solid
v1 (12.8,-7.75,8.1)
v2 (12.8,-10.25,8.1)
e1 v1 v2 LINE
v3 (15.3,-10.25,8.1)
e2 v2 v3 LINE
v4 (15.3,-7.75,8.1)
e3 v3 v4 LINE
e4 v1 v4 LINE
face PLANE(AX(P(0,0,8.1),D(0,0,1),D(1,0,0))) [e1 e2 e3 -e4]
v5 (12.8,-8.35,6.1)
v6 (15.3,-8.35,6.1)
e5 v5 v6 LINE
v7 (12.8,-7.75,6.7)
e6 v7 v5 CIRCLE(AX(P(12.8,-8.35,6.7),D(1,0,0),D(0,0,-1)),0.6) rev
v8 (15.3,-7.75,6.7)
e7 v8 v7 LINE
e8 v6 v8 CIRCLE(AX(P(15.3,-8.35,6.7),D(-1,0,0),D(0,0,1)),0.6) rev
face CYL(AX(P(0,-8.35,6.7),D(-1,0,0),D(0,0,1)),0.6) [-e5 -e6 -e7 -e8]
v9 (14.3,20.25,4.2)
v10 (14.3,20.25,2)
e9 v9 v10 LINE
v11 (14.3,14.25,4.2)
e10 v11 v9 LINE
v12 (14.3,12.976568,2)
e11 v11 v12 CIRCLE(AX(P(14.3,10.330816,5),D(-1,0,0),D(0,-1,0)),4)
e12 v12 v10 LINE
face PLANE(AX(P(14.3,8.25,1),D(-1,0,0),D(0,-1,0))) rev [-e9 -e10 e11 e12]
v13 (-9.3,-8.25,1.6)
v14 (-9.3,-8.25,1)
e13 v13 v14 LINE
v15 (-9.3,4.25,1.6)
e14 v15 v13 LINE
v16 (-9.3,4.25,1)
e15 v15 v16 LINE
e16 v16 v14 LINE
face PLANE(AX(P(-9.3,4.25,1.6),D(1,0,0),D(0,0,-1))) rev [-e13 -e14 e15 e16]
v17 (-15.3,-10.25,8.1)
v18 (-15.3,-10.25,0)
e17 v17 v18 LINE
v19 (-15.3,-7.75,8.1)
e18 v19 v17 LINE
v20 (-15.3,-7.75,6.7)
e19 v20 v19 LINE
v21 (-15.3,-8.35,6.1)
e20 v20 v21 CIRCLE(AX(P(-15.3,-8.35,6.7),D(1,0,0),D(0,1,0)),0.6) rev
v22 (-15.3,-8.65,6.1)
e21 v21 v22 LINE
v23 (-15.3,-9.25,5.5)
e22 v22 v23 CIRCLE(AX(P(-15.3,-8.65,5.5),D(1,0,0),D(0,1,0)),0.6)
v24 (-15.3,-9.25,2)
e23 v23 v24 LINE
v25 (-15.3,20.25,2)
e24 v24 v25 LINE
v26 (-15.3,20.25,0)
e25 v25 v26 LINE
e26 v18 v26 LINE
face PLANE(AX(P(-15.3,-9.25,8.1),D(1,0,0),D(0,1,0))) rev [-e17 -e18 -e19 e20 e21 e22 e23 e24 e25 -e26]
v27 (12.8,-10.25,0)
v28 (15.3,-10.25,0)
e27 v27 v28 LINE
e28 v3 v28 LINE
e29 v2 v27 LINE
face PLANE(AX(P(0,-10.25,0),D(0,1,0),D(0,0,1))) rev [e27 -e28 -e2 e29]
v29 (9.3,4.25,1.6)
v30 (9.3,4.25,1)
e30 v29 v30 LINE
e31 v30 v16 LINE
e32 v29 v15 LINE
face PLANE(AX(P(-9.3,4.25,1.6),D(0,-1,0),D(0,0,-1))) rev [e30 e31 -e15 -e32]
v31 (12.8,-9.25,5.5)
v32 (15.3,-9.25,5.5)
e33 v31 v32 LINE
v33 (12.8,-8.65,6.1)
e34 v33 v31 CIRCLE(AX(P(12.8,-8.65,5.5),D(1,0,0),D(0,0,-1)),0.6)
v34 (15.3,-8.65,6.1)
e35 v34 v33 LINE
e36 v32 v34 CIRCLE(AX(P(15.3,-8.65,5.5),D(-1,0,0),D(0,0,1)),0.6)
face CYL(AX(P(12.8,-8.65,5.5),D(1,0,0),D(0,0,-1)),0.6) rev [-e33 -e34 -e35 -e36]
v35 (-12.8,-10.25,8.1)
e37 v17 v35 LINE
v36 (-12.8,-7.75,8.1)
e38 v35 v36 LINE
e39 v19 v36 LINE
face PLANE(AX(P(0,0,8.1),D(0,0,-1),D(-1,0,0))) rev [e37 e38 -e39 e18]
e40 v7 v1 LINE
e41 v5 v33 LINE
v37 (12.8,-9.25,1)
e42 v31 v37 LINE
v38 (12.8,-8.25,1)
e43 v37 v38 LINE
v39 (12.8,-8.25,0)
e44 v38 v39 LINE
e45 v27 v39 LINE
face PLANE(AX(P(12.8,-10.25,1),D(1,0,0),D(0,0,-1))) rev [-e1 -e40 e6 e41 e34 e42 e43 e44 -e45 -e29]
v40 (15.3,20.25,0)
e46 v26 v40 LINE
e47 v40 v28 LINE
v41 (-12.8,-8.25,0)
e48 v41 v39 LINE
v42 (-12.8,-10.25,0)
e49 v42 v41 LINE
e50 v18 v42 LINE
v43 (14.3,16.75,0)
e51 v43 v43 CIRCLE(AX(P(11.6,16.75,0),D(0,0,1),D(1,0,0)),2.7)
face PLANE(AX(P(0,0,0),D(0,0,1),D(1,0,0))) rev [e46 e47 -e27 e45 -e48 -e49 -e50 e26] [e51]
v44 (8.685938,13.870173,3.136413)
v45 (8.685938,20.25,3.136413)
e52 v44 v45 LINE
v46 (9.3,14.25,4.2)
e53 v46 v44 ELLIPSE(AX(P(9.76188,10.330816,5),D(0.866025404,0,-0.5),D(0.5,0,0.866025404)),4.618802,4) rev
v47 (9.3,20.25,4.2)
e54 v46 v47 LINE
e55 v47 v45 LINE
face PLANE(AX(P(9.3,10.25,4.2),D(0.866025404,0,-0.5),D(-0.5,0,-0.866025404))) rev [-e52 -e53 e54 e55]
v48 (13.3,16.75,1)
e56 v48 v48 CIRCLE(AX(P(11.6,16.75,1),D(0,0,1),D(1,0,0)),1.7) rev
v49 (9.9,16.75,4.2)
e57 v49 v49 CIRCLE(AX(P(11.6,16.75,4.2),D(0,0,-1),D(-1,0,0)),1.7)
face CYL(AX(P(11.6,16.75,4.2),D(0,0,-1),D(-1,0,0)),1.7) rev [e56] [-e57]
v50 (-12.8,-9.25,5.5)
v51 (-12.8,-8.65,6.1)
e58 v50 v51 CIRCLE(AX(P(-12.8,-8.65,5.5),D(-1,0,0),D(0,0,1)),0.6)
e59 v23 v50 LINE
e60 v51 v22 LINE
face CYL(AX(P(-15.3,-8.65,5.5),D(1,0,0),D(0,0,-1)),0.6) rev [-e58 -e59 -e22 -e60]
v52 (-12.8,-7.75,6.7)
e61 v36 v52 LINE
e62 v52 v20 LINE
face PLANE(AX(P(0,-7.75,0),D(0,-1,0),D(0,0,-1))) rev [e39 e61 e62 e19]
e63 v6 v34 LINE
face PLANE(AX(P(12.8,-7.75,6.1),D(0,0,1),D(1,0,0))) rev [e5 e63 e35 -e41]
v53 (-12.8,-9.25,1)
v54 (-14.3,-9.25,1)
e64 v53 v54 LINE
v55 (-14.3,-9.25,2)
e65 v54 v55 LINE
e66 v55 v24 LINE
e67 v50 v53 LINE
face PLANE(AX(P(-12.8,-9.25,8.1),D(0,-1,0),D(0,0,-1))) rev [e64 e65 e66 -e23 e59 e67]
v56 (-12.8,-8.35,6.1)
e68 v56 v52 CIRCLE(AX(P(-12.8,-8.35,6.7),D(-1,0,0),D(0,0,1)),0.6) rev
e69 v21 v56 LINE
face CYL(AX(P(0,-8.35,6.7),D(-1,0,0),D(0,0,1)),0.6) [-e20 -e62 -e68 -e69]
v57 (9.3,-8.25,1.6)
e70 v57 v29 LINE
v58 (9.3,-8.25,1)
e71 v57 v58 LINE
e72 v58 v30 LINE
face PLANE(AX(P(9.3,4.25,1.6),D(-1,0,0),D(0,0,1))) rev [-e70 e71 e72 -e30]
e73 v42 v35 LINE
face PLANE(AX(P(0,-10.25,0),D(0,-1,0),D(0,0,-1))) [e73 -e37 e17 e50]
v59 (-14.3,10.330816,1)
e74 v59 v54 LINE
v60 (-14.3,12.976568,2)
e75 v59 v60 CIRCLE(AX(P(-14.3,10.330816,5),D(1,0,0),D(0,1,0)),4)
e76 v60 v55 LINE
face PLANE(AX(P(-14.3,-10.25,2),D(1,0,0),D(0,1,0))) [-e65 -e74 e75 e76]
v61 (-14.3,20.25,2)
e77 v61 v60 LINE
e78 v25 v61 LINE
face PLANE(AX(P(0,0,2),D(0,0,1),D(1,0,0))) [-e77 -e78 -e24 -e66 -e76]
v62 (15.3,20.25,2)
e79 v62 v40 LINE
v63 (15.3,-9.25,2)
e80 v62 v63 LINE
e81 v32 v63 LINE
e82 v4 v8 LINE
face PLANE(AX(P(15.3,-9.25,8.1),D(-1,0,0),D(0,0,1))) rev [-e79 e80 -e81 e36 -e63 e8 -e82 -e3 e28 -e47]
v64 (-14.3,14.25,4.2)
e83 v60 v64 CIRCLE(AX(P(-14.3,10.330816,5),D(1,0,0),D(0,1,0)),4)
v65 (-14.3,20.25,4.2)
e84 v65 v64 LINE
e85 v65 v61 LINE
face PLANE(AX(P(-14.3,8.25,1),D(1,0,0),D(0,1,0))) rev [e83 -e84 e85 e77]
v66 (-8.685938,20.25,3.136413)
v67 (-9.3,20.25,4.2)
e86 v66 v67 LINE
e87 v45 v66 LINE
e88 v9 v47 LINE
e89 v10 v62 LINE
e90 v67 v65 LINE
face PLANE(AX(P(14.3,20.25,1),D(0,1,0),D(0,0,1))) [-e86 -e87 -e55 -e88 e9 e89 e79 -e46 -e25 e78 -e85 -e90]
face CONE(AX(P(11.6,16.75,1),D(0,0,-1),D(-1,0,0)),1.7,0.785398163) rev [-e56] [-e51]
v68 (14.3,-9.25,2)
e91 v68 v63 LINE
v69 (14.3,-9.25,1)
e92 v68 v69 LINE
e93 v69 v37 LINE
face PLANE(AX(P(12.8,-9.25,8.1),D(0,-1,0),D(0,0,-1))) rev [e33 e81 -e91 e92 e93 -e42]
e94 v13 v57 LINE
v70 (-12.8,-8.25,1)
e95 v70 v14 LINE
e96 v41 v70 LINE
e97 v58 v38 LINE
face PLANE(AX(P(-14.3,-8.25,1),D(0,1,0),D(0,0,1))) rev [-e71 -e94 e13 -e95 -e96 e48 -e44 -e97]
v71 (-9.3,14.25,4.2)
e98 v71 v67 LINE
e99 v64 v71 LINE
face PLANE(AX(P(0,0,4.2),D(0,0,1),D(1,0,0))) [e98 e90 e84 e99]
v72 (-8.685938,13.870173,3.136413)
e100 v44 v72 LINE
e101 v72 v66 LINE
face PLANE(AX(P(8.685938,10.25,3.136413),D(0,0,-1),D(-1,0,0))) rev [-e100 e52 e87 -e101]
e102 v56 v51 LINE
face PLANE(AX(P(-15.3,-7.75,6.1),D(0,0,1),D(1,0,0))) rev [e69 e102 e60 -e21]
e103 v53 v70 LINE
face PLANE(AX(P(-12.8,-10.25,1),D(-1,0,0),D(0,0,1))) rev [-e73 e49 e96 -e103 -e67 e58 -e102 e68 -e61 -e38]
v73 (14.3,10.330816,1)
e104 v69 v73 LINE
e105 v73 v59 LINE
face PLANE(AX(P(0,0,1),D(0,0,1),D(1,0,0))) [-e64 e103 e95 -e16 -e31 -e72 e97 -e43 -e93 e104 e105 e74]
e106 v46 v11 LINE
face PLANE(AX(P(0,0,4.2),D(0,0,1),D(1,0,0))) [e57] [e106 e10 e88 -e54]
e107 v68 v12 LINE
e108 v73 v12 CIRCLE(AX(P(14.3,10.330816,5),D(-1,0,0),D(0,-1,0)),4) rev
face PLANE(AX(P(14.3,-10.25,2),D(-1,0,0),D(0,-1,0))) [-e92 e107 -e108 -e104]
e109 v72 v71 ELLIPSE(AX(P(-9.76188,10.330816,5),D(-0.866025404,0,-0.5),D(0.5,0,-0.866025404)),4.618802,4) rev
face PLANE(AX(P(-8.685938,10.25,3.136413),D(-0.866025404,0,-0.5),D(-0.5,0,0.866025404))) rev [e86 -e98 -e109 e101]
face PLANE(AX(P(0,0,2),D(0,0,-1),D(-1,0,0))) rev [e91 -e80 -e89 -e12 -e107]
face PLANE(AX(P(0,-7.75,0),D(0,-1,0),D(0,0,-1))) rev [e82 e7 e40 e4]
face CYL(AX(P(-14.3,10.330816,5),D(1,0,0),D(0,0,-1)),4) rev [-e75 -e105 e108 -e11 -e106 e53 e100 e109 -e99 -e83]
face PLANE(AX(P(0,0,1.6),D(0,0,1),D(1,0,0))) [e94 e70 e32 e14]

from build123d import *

# Parameters (mm, degrees)
ESQUISSE1_W             = 28.6
ESQUISSE1_H             = 16.5
BOSS_EXTRU_1_DEPTH      = 1
ESQUISSE2_W             = 18.6
ESQUISSE2_H             = 12.5
BOSS_EXTRU_2_DEPTH      = 0.6
ESQUISSE3_W             = 28.6
ESQUISSE3_H             = 12
BOSS_EXTRU_3_DEPTH      = 1
ESQUISSE4_W             = 28.6
ESQUISSE4_H             = 6
BOSS_EXTRU_4_DEPTH      = 3.2
ESQUISSE5_R             = 1.7
ENL_V_MAT_EXTRU_1_DEPTH = 26.143438508
CONG_1_R                = 4
ESQUISSE6_W             = 1.5
ESQUISSE6_H             = 1
BOSS_EXTRU_5_DEPTH      = 2
ESQUISSE7_W             = 2.5
ESQUISSE7_H             = 1
BOSS_EXTRU_6_DEPTH      = 7.1
ESQUISSE8_W             = 2.5
ESQUISSE8_H             = 2
BOSS_EXTRU_7_DEPTH      = 1.5
CONG_2_R                = 0.6
ESQUISSE9_W             = 1
ESQUISSE9_H             = 30.5
BOSS_EXTRU_8_DEPTH      = 2
CHANFREIN2_SIZE         = 1
ENL_V_MAT_EXTRU_2_DEPTH = 10


with BuildPart() as part:
    # Esquisse1 → Boss.-Extru.1 (new body)
    with BuildSketch(Plane.XY):
        Rectangle(ESQUISSE1_W, ESQUISSE1_H)
    extrude(amount=BOSS_EXTRU_1_DEPTH)

    # Esquisse2 → Boss.-Extru.2 (add)
    with BuildSketch(Plane.XY.offset(1)):
        with Locations((0, -2)):
            Rectangle(ESQUISSE2_W, ESQUISSE2_H)
    extrude(amount=BOSS_EXTRU_2_DEPTH)

    # Esquisse3 → Boss.-Extru.3 (add)
    with BuildSketch(Plane(origin=(0, 0, 0), x_dir=(-1, 0, 0), z_dir=(0, 0, -1))):
        with Locations((0, 14.25)):
            Rectangle(ESQUISSE3_W, ESQUISSE3_H)
    extrude(amount=-BOSS_EXTRU_3_DEPTH)

    # Esquisse4 → Boss.-Extru.4 (add)
    with BuildSketch(Plane.XY.offset(1)):
        with Locations((0, 17.25)):
            Rectangle(ESQUISSE4_W, ESQUISSE4_H)
    extrude(amount=BOSS_EXTRU_4_DEPTH)

    # Esquisse5 → Enlèv. mat.-Extru.1 (cut, through all)
    with BuildSketch(Plane(origin=(0, 0, 0), x_dir=(-1, 0, 0), z_dir=(0, 0, -1))):
        with Locations((-11.6, 16.75)):
            Circle(ESQUISSE5_R)
    extrude(amount=-ENL_V_MAT_EXTRU_1_DEPTH, mode=Mode.SUBTRACT)

    # Congé1
    # the kernel refuses this fillet: 4 mm, written as the material it adds along each edge
    with BuildSketch(Plane(origin=(14.3, 14.25, 1), x_dir=(0, -1, 0), z_dir=(-1, 0, 0))) as cong_1_piece_1:
        with BuildLine():
            CenterArc((3.919183588, 4), CONG_1_R, 191.536959033, 78.463040967)
            Line((0, 3.2), (-0.078383672, 3.184))
            ThreePointArc((-0.078383672, 3.184), (-0.08, 1.6), (-0.08, 0))
            Line((-0.08, 0), (0, -0.08))
            Line((0, -0.08), (3.919183588, -0.08))
            Line((3.919183588, -0.08), (3.919183588, 0))
        make_face()
    extrude(amount=28.6)

    # Esquisse6 → Boss.-Extru.5 (add)
    with BuildSketch(Plane.XZ.offset(8.25)):
        with Locations((-13.55, 0.5)):
            Rectangle(ESQUISSE6_W, ESQUISSE6_H)
        with Locations((13.55, 0.5)):
            Rectangle(ESQUISSE6_W, ESQUISSE6_H)
    extrude(amount=BOSS_EXTRU_5_DEPTH)

    # Esquisse7 → Boss.-Extru.6 (add)
    with BuildSketch(Plane.XY.offset(1)):
        with Locations((-14.05, -9.75)):
            Rectangle(ESQUISSE7_W, ESQUISSE7_H)
        with Locations((14.05, -9.75)):
            Rectangle(ESQUISSE7_W, ESQUISSE7_H)
    extrude(amount=BOSS_EXTRU_6_DEPTH)

    # Esquisse8 → Boss.-Extru.7 (add)
    with BuildSketch(Plane(origin=(0, -9.25, 0), x_dir=(1, 0, 0), z_dir=(0, 1, 0))):
        with Locations((-14.05, -7.1)):
            Rectangle(ESQUISSE8_W, ESQUISSE8_H)
        with Locations((14.05, -7.1)):
            Rectangle(ESQUISSE8_W, ESQUISSE8_H)
    extrude(amount=BOSS_EXTRU_7_DEPTH)

    # Congé2
    cong_2_edges = [part.edges().sort_by_distance(p)[0] for p in [
        (-14.05, -9.25, 6.1),
        (-14.05, -7.75, 6.1),
        (14.05, -9.25, 6.1),
        (14.05, -7.75, 6.1),
    ]]
    fillet(cong_2_edges, radius=CONG_2_R)

    # Esquisse9 → Boss.-Extru.8 (add)
    with BuildSketch(Plane(origin=(0, 0, 0), x_dir=(-1, 0, 0), z_dir=(0, 0, -1))):
        with Locations((-14.8, 5)):
            Rectangle(ESQUISSE9_W, ESQUISSE9_H)
        with Locations((14.8, 5)):
            Rectangle(ESQUISSE9_W, ESQUISSE9_H)
    extrude(amount=-BOSS_EXTRU_8_DEPTH)

    # Chanfrein2
    chanfrein2_edges = [part.edges().sort_by_distance(p)[0] for p in [
        (13.3, 16.75, 0),
    ]]
    chamfer(chanfrein2_edges, length=CHANFREIN2_SIZE)

    # Esquisse10 → Enlèv. mat.-Extru.2 (cut)
    with BuildSketch(Plane(origin=(0, 20.25, 0), x_dir=(1, 0, 0), z_dir=(0, 1, 0))):
        Polygon((9.3, -4.2), (8.685937971, -3.136413366), (-8.685937971, -3.136413366), (-9.3, -4.2), align=None)
    extrude(amount=-ENL_V_MAT_EXTRU_2_DEPTH, mode=Mode.SUBTRACT)


solid = part.part
